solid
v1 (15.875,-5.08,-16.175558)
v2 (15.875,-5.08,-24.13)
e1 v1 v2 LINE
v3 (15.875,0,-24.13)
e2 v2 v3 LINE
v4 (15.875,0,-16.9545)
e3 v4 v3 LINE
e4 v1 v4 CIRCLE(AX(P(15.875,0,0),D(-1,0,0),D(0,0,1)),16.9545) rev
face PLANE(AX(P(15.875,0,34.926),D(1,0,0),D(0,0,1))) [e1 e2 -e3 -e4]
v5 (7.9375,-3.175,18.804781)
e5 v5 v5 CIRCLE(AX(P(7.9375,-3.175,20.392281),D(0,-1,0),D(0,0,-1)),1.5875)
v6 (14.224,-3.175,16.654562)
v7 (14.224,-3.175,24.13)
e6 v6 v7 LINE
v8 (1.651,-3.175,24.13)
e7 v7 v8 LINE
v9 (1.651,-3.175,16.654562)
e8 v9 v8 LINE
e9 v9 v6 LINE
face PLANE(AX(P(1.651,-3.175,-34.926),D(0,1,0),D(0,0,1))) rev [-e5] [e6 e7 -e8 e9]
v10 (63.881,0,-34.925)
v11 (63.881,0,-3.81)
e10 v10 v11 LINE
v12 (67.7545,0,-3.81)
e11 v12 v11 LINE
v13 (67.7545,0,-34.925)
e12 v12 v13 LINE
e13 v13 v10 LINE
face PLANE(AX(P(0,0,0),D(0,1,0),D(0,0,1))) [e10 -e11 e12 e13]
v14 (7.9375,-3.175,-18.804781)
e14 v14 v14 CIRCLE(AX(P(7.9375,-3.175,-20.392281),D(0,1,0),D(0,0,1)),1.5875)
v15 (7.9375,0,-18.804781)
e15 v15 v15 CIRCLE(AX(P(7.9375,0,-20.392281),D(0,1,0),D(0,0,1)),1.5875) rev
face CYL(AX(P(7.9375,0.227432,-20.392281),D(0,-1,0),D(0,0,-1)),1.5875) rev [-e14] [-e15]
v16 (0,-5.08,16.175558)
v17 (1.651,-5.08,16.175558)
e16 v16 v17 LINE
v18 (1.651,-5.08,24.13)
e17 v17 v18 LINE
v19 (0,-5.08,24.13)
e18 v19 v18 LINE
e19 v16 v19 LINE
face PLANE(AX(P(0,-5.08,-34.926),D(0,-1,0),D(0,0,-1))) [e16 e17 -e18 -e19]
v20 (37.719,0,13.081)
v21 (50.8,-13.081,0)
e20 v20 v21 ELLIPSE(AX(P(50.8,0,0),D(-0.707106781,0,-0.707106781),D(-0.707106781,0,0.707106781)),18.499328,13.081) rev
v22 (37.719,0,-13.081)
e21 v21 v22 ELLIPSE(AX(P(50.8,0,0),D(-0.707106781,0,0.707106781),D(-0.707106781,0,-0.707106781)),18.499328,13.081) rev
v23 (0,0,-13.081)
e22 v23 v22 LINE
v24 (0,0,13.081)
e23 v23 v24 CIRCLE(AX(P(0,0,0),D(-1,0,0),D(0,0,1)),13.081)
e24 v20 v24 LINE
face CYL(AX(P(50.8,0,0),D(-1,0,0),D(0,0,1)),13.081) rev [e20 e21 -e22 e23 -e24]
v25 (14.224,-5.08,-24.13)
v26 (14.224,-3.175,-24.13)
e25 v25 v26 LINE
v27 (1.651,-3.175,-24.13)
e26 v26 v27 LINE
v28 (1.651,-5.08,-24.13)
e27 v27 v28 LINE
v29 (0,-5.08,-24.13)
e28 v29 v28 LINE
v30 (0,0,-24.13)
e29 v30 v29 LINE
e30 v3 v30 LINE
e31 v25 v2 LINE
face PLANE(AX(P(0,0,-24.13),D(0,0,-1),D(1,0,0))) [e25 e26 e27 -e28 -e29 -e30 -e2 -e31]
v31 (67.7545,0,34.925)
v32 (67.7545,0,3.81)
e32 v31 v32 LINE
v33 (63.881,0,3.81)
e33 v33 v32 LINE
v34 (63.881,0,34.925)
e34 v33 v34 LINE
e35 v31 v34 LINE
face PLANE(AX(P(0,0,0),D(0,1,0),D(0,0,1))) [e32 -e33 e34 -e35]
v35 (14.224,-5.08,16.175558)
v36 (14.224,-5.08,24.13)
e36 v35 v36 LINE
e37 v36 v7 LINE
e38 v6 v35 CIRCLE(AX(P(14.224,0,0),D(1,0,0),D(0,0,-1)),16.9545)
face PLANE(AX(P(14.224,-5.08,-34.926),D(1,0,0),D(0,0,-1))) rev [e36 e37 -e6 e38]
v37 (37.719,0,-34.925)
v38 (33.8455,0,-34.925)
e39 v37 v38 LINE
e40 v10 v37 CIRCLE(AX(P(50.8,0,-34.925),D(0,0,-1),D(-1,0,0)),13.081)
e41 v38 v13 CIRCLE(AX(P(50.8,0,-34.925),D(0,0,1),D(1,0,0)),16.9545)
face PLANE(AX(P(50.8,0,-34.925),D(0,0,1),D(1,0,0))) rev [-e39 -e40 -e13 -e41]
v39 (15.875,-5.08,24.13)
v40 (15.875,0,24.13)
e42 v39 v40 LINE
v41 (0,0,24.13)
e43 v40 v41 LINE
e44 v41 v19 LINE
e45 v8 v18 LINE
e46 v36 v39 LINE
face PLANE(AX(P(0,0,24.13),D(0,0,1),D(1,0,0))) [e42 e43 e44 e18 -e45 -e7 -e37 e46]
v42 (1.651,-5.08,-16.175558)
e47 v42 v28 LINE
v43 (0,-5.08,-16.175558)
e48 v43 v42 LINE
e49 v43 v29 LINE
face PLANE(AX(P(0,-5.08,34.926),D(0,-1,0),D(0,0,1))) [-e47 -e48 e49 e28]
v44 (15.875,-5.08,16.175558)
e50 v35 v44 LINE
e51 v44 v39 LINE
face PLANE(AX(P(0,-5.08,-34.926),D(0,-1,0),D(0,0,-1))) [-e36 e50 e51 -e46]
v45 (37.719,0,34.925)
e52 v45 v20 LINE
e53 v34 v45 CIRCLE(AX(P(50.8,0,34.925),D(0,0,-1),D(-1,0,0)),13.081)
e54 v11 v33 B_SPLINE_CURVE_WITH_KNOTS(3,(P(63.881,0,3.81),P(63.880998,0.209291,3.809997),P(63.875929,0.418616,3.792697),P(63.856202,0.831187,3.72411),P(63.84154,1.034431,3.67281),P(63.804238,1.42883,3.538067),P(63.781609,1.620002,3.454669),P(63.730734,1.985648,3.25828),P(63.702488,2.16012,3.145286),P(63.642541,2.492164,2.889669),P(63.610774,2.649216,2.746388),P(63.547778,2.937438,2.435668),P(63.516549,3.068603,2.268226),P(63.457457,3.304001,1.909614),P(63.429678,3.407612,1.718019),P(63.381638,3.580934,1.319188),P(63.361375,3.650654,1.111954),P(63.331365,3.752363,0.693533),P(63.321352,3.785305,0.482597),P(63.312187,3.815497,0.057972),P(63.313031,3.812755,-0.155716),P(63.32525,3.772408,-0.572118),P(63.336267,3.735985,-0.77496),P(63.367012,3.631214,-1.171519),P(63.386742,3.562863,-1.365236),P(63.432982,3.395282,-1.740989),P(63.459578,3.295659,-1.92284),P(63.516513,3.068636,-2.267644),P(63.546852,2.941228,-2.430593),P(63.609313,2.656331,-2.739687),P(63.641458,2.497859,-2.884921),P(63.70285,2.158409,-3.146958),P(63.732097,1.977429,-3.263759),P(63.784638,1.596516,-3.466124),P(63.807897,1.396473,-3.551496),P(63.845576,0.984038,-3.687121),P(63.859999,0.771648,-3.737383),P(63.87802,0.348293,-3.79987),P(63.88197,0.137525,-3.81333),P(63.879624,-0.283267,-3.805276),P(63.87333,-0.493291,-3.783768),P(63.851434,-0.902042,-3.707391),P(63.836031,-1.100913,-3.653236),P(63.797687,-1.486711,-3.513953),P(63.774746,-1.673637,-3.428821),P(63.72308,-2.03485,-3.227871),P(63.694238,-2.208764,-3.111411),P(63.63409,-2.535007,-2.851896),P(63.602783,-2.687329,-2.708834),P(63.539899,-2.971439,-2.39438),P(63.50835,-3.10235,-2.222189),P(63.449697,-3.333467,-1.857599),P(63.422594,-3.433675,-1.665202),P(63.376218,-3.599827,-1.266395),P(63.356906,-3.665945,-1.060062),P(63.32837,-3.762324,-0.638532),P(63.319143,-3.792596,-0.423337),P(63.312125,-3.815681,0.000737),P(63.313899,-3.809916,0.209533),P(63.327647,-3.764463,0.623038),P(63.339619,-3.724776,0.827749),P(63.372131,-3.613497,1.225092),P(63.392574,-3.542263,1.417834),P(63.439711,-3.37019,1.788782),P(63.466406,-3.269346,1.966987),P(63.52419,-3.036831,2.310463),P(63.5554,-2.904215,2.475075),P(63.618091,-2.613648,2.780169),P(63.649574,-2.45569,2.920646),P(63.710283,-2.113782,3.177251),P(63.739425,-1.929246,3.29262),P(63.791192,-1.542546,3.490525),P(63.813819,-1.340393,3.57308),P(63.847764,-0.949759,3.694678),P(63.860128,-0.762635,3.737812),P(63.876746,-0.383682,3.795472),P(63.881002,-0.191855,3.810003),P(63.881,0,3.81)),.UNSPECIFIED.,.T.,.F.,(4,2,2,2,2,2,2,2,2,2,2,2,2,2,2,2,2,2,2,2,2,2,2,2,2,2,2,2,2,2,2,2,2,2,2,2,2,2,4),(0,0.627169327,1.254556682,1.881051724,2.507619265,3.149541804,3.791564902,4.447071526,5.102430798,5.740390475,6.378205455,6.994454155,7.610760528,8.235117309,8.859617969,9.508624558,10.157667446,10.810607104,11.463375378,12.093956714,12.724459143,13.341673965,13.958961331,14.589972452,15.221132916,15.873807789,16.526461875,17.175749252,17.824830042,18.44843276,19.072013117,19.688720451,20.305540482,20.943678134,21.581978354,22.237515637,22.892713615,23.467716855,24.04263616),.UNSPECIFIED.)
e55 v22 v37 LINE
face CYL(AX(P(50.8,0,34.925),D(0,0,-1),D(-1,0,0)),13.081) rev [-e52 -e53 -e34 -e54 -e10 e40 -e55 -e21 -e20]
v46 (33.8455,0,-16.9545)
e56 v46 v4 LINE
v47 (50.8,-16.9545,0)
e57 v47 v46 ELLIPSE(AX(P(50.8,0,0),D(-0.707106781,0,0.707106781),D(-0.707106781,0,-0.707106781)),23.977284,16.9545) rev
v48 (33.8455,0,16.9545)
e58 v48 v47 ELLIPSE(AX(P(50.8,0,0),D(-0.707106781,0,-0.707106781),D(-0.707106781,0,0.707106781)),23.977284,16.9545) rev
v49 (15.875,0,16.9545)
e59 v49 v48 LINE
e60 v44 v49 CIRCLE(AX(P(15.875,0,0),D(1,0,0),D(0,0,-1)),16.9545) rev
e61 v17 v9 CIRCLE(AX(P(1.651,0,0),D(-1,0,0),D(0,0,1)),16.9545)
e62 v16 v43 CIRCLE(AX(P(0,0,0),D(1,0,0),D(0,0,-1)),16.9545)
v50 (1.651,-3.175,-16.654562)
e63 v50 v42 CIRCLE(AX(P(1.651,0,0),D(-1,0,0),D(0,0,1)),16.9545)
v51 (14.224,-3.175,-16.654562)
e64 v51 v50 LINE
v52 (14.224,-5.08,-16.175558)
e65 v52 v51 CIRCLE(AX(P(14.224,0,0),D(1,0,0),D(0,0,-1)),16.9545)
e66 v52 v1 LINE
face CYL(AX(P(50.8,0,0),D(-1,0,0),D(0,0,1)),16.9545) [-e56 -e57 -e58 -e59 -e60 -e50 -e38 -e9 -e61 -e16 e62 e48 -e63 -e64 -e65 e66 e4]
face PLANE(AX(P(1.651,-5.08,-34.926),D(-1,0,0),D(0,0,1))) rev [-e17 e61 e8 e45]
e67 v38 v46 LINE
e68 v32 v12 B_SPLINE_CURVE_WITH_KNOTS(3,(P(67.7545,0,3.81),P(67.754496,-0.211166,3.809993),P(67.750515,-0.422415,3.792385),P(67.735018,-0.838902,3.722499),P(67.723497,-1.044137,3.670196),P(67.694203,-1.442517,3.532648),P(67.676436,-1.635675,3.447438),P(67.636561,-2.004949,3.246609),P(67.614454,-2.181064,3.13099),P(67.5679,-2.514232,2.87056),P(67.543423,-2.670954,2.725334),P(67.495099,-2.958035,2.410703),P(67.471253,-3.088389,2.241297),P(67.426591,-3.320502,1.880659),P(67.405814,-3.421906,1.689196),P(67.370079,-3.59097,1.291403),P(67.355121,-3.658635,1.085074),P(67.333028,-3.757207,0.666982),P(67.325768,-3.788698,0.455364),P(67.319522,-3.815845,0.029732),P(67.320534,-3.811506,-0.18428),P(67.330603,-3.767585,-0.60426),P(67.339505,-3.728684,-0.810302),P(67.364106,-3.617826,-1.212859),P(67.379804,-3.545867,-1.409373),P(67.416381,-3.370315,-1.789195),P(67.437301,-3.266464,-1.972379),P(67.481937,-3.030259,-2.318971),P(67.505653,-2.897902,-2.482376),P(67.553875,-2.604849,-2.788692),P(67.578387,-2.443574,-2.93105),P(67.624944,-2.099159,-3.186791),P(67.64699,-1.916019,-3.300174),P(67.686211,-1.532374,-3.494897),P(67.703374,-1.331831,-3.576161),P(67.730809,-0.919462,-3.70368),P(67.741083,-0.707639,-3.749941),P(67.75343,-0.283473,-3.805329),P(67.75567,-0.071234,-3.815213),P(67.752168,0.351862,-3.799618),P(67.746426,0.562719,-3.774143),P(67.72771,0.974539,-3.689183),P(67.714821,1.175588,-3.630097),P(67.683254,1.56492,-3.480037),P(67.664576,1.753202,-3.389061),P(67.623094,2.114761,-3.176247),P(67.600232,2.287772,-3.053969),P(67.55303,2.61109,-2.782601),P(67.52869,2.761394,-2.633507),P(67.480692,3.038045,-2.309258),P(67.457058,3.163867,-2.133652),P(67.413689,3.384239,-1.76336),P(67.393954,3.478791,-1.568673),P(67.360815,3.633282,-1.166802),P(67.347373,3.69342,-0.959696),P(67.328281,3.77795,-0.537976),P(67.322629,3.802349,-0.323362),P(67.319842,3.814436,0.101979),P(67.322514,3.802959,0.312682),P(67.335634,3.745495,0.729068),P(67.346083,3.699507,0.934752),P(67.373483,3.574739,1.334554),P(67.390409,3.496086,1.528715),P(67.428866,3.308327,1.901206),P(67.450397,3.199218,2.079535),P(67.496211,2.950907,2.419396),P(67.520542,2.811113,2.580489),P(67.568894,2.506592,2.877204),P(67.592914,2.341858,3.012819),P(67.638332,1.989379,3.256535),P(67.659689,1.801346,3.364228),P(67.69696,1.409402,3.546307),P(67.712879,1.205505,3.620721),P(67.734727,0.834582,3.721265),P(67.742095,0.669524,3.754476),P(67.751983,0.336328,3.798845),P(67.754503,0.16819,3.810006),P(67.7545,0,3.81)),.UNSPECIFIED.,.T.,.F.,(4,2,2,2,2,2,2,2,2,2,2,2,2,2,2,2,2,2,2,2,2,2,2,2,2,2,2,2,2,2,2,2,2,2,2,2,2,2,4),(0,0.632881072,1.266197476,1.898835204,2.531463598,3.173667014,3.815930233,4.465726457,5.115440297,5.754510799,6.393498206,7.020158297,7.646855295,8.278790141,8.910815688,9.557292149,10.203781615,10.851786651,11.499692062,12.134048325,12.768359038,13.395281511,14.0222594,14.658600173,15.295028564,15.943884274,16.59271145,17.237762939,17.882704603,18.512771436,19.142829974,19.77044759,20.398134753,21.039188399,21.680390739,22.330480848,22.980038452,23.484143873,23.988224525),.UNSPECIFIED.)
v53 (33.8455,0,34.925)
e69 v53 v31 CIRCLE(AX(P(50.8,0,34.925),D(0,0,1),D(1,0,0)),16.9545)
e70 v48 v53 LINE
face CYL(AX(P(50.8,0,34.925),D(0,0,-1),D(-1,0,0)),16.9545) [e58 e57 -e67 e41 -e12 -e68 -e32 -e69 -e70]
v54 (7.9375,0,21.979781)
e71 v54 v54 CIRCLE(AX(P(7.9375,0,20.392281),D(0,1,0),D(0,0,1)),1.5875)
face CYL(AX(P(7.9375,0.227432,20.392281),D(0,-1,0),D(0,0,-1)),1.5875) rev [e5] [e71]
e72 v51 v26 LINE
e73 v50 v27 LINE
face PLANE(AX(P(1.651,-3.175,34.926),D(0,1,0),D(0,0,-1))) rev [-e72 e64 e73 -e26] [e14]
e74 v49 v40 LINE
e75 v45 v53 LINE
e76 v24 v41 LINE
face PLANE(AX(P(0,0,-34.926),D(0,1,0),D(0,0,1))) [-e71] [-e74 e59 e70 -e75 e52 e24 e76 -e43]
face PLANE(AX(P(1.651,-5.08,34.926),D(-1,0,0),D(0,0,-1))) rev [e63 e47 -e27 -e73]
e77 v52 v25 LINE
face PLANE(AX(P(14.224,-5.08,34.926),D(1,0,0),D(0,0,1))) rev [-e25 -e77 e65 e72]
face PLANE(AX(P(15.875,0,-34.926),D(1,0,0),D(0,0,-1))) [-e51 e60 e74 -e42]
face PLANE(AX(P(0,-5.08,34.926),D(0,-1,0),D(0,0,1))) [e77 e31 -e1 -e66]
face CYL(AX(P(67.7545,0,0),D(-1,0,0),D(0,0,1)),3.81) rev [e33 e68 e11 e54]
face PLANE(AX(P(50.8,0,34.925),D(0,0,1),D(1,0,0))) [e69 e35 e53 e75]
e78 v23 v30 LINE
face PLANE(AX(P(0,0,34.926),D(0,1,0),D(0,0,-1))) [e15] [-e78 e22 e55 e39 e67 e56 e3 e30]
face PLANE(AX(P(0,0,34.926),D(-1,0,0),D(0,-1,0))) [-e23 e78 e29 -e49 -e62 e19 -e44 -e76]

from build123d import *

# Parameters (mm, degrees)
SKETCH1_R                = 16.9545
BOSS_EXTRUDE1_DEPTH      = 50.8
SKETCH2_R                = 16.9545
BOSS_EXTRUDE2_DEPTH      = 34.925
SKETCH3_R                = 13.081
CUT_EXTRUDE1_DEPTH       = 50.8
SKETCH5_R                = 13.081
CUT_EXTRUDE2_DEPTH       = 69.85
CUT_EXTRUDE4_DEPTH       = 79.088942658
CUT_EXTRUDE4_DEPTH_BACK  = 79.088942658
SKETCH6_R                = 3.81
BOSS_EXTRUDE3_REACH      = 93.464
BOSS_EXTRUDE3_END_RADIUS = 16.9545
SKETCH8_W                = 15.875
SKETCH8_H                = 5.08
CUT_EXTRUDE5_REACH       = 93.464
CUT_EXTRUDE5_END_RADIUS  = 16.9545
SKETCH9_W                = 12.573
SKETCH9_H                = 1.905
SKETCH10_R               = 1.5875
CUT_EXTRUDE6_DEPTH       = 78.461619779


with BuildPart() as part:
    # Sketch1 → Boss-Extrude1 (new body)
    with BuildSketch(Plane(origin=(0, 0, 0), x_dir=(0, 0, -1), z_dir=(1, 0, 0))):
        Circle(SKETCH1_R)
    extrude(amount=BOSS_EXTRUDE1_DEPTH)

    # Sketch2 → Boss-Extrude2 (add, symmetric)
    with BuildSketch(Plane.XY):
        with Locations((50.8, 0)):
            Circle(SKETCH2_R)
    extrude(amount=BOSS_EXTRUDE2_DEPTH, both=True)

    # Sketch3 → Cut-Extrude1 (cut)
    with BuildSketch(Plane.ZY):
        Circle(SKETCH3_R)
    extrude(amount=-CUT_EXTRUDE1_DEPTH, mode=Mode.SUBTRACT)

    # Sketch5 → Cut-Extrude2 (cut)
    with BuildSketch(Plane(origin=(0, 0, -34.925), x_dir=(-1, 0, 0), z_dir=(0, 0, -1))):
        with Locations((-50.8, 0)):
            Circle(SKETCH5_R)
    extrude(amount=-CUT_EXTRUDE2_DEPTH, mode=Mode.SUBTRACT)

    # Sketch6 → Cut-Extrude4 (cut, two sides: drawn at the far end of the back side and taken through both)
    with BuildSketch(Plane(origin=(0, 0, 0), x_dir=(0, 0, -1), z_dir=(1, 0, 0)).offset(-CUT_EXTRUDE4_DEPTH_BACK)):
        with Locations(Location((0, 0, 0), (0, 0, 180))):
            Circle(SKETCH6_R)
    extrude(amount=CUT_EXTRUDE4_DEPTH + CUT_EXTRUDE4_DEPTH_BACK, mode=Mode.SUBTRACT)

    # SurfaceCut1
    split(bisect_by=Plane(origin=(0, 0, 0), x_dir=(1, 0, 0), z_dir=(0, 1, 0)), keep=Keep.BOTTOM)


with BuildPart() as body_2:
    # Boss-Extrude3: up to this cylinder (the profile starts outside it)
    boss_extrude3_end = Plane(origin=(7.9375, 0, 0), z_dir=(-1, 0, 0)) * Cylinder(BOSS_EXTRUDE3_END_RADIUS, 221.837, mode=Mode.PRIVATE)
    # Sketch8 → Boss-Extrude3 (new, up to the surface)
    with BuildSketch(Plane.XY.offset(24.13), mode=Mode.PRIVATE) as boss_extrude3_sk1:
        with Locations((7.9375, -2.54)):
            Rectangle(SKETCH8_W, SKETCH8_H)
    boss_extrude3_tool1 = extrude(boss_extrude3_sk1.sketch, amount=-BOSS_EXTRUDE3_REACH, mode=Mode.PRIVATE) - boss_extrude3_end
    add(boss_extrude3_tool1.solids().sort_by_distance((7.9375, -2.54, 24.13))[0])

    # Cut-Extrude5: up to this cylinder (the profile starts outside it)
    cut_extrude5_end = Plane(origin=(7.9375, 0, 0), z_dir=(-1, 0, 0)) * Cylinder(CUT_EXTRUDE5_END_RADIUS, 221.837, mode=Mode.PRIVATE)
    # Sketch9 → Cut-Extrude5 (cut, up to the surface)
    with BuildSketch(Plane.XY.offset(24.13), mode=Mode.PRIVATE) as cut_extrude5_sk1:
        with Locations((7.9375, -4.1275)):
            Rectangle(SKETCH9_W, SKETCH9_H)
    cut_extrude5_tool1 = extrude(cut_extrude5_sk1.sketch, amount=-CUT_EXTRUDE5_REACH, mode=Mode.PRIVATE) - cut_extrude5_end
    add(cut_extrude5_tool1.solids().sort_by_distance((7.9375, -4.1275, 24.13))[0], mode=Mode.SUBTRACT)


with BuildPart() as body_3:
    # Mirror1: mirrored copy
    add(body_2.part.mirror(Plane.XY))


with BuildPart() as part_1:
    add(part.part)

    # Intersect1: read off the stored shape, not the designer's step
    # Intersect1: union body 3, body 2
    add(body_3.part)
    add(body_2.part)

    # Sketch10 → Cut-Extrude6 (cut, through all)
    with BuildSketch(Plane.XZ.offset(3.175)):
        with Locations(Location((7.9375, 20.392281148, 0), (0, 0, 270))):
            Circle(SKETCH10_R)
    cut_extrude6 = extrude(amount=-CUT_EXTRUDE6_DEPTH, mode=Mode.SUBTRACT)

    # Mirror2: Cut-Extrude6 across plane
    add(cut_extrude6.mirror(Plane.XY), mode=Mode.SUBTRACT)


solid = part_1.part
